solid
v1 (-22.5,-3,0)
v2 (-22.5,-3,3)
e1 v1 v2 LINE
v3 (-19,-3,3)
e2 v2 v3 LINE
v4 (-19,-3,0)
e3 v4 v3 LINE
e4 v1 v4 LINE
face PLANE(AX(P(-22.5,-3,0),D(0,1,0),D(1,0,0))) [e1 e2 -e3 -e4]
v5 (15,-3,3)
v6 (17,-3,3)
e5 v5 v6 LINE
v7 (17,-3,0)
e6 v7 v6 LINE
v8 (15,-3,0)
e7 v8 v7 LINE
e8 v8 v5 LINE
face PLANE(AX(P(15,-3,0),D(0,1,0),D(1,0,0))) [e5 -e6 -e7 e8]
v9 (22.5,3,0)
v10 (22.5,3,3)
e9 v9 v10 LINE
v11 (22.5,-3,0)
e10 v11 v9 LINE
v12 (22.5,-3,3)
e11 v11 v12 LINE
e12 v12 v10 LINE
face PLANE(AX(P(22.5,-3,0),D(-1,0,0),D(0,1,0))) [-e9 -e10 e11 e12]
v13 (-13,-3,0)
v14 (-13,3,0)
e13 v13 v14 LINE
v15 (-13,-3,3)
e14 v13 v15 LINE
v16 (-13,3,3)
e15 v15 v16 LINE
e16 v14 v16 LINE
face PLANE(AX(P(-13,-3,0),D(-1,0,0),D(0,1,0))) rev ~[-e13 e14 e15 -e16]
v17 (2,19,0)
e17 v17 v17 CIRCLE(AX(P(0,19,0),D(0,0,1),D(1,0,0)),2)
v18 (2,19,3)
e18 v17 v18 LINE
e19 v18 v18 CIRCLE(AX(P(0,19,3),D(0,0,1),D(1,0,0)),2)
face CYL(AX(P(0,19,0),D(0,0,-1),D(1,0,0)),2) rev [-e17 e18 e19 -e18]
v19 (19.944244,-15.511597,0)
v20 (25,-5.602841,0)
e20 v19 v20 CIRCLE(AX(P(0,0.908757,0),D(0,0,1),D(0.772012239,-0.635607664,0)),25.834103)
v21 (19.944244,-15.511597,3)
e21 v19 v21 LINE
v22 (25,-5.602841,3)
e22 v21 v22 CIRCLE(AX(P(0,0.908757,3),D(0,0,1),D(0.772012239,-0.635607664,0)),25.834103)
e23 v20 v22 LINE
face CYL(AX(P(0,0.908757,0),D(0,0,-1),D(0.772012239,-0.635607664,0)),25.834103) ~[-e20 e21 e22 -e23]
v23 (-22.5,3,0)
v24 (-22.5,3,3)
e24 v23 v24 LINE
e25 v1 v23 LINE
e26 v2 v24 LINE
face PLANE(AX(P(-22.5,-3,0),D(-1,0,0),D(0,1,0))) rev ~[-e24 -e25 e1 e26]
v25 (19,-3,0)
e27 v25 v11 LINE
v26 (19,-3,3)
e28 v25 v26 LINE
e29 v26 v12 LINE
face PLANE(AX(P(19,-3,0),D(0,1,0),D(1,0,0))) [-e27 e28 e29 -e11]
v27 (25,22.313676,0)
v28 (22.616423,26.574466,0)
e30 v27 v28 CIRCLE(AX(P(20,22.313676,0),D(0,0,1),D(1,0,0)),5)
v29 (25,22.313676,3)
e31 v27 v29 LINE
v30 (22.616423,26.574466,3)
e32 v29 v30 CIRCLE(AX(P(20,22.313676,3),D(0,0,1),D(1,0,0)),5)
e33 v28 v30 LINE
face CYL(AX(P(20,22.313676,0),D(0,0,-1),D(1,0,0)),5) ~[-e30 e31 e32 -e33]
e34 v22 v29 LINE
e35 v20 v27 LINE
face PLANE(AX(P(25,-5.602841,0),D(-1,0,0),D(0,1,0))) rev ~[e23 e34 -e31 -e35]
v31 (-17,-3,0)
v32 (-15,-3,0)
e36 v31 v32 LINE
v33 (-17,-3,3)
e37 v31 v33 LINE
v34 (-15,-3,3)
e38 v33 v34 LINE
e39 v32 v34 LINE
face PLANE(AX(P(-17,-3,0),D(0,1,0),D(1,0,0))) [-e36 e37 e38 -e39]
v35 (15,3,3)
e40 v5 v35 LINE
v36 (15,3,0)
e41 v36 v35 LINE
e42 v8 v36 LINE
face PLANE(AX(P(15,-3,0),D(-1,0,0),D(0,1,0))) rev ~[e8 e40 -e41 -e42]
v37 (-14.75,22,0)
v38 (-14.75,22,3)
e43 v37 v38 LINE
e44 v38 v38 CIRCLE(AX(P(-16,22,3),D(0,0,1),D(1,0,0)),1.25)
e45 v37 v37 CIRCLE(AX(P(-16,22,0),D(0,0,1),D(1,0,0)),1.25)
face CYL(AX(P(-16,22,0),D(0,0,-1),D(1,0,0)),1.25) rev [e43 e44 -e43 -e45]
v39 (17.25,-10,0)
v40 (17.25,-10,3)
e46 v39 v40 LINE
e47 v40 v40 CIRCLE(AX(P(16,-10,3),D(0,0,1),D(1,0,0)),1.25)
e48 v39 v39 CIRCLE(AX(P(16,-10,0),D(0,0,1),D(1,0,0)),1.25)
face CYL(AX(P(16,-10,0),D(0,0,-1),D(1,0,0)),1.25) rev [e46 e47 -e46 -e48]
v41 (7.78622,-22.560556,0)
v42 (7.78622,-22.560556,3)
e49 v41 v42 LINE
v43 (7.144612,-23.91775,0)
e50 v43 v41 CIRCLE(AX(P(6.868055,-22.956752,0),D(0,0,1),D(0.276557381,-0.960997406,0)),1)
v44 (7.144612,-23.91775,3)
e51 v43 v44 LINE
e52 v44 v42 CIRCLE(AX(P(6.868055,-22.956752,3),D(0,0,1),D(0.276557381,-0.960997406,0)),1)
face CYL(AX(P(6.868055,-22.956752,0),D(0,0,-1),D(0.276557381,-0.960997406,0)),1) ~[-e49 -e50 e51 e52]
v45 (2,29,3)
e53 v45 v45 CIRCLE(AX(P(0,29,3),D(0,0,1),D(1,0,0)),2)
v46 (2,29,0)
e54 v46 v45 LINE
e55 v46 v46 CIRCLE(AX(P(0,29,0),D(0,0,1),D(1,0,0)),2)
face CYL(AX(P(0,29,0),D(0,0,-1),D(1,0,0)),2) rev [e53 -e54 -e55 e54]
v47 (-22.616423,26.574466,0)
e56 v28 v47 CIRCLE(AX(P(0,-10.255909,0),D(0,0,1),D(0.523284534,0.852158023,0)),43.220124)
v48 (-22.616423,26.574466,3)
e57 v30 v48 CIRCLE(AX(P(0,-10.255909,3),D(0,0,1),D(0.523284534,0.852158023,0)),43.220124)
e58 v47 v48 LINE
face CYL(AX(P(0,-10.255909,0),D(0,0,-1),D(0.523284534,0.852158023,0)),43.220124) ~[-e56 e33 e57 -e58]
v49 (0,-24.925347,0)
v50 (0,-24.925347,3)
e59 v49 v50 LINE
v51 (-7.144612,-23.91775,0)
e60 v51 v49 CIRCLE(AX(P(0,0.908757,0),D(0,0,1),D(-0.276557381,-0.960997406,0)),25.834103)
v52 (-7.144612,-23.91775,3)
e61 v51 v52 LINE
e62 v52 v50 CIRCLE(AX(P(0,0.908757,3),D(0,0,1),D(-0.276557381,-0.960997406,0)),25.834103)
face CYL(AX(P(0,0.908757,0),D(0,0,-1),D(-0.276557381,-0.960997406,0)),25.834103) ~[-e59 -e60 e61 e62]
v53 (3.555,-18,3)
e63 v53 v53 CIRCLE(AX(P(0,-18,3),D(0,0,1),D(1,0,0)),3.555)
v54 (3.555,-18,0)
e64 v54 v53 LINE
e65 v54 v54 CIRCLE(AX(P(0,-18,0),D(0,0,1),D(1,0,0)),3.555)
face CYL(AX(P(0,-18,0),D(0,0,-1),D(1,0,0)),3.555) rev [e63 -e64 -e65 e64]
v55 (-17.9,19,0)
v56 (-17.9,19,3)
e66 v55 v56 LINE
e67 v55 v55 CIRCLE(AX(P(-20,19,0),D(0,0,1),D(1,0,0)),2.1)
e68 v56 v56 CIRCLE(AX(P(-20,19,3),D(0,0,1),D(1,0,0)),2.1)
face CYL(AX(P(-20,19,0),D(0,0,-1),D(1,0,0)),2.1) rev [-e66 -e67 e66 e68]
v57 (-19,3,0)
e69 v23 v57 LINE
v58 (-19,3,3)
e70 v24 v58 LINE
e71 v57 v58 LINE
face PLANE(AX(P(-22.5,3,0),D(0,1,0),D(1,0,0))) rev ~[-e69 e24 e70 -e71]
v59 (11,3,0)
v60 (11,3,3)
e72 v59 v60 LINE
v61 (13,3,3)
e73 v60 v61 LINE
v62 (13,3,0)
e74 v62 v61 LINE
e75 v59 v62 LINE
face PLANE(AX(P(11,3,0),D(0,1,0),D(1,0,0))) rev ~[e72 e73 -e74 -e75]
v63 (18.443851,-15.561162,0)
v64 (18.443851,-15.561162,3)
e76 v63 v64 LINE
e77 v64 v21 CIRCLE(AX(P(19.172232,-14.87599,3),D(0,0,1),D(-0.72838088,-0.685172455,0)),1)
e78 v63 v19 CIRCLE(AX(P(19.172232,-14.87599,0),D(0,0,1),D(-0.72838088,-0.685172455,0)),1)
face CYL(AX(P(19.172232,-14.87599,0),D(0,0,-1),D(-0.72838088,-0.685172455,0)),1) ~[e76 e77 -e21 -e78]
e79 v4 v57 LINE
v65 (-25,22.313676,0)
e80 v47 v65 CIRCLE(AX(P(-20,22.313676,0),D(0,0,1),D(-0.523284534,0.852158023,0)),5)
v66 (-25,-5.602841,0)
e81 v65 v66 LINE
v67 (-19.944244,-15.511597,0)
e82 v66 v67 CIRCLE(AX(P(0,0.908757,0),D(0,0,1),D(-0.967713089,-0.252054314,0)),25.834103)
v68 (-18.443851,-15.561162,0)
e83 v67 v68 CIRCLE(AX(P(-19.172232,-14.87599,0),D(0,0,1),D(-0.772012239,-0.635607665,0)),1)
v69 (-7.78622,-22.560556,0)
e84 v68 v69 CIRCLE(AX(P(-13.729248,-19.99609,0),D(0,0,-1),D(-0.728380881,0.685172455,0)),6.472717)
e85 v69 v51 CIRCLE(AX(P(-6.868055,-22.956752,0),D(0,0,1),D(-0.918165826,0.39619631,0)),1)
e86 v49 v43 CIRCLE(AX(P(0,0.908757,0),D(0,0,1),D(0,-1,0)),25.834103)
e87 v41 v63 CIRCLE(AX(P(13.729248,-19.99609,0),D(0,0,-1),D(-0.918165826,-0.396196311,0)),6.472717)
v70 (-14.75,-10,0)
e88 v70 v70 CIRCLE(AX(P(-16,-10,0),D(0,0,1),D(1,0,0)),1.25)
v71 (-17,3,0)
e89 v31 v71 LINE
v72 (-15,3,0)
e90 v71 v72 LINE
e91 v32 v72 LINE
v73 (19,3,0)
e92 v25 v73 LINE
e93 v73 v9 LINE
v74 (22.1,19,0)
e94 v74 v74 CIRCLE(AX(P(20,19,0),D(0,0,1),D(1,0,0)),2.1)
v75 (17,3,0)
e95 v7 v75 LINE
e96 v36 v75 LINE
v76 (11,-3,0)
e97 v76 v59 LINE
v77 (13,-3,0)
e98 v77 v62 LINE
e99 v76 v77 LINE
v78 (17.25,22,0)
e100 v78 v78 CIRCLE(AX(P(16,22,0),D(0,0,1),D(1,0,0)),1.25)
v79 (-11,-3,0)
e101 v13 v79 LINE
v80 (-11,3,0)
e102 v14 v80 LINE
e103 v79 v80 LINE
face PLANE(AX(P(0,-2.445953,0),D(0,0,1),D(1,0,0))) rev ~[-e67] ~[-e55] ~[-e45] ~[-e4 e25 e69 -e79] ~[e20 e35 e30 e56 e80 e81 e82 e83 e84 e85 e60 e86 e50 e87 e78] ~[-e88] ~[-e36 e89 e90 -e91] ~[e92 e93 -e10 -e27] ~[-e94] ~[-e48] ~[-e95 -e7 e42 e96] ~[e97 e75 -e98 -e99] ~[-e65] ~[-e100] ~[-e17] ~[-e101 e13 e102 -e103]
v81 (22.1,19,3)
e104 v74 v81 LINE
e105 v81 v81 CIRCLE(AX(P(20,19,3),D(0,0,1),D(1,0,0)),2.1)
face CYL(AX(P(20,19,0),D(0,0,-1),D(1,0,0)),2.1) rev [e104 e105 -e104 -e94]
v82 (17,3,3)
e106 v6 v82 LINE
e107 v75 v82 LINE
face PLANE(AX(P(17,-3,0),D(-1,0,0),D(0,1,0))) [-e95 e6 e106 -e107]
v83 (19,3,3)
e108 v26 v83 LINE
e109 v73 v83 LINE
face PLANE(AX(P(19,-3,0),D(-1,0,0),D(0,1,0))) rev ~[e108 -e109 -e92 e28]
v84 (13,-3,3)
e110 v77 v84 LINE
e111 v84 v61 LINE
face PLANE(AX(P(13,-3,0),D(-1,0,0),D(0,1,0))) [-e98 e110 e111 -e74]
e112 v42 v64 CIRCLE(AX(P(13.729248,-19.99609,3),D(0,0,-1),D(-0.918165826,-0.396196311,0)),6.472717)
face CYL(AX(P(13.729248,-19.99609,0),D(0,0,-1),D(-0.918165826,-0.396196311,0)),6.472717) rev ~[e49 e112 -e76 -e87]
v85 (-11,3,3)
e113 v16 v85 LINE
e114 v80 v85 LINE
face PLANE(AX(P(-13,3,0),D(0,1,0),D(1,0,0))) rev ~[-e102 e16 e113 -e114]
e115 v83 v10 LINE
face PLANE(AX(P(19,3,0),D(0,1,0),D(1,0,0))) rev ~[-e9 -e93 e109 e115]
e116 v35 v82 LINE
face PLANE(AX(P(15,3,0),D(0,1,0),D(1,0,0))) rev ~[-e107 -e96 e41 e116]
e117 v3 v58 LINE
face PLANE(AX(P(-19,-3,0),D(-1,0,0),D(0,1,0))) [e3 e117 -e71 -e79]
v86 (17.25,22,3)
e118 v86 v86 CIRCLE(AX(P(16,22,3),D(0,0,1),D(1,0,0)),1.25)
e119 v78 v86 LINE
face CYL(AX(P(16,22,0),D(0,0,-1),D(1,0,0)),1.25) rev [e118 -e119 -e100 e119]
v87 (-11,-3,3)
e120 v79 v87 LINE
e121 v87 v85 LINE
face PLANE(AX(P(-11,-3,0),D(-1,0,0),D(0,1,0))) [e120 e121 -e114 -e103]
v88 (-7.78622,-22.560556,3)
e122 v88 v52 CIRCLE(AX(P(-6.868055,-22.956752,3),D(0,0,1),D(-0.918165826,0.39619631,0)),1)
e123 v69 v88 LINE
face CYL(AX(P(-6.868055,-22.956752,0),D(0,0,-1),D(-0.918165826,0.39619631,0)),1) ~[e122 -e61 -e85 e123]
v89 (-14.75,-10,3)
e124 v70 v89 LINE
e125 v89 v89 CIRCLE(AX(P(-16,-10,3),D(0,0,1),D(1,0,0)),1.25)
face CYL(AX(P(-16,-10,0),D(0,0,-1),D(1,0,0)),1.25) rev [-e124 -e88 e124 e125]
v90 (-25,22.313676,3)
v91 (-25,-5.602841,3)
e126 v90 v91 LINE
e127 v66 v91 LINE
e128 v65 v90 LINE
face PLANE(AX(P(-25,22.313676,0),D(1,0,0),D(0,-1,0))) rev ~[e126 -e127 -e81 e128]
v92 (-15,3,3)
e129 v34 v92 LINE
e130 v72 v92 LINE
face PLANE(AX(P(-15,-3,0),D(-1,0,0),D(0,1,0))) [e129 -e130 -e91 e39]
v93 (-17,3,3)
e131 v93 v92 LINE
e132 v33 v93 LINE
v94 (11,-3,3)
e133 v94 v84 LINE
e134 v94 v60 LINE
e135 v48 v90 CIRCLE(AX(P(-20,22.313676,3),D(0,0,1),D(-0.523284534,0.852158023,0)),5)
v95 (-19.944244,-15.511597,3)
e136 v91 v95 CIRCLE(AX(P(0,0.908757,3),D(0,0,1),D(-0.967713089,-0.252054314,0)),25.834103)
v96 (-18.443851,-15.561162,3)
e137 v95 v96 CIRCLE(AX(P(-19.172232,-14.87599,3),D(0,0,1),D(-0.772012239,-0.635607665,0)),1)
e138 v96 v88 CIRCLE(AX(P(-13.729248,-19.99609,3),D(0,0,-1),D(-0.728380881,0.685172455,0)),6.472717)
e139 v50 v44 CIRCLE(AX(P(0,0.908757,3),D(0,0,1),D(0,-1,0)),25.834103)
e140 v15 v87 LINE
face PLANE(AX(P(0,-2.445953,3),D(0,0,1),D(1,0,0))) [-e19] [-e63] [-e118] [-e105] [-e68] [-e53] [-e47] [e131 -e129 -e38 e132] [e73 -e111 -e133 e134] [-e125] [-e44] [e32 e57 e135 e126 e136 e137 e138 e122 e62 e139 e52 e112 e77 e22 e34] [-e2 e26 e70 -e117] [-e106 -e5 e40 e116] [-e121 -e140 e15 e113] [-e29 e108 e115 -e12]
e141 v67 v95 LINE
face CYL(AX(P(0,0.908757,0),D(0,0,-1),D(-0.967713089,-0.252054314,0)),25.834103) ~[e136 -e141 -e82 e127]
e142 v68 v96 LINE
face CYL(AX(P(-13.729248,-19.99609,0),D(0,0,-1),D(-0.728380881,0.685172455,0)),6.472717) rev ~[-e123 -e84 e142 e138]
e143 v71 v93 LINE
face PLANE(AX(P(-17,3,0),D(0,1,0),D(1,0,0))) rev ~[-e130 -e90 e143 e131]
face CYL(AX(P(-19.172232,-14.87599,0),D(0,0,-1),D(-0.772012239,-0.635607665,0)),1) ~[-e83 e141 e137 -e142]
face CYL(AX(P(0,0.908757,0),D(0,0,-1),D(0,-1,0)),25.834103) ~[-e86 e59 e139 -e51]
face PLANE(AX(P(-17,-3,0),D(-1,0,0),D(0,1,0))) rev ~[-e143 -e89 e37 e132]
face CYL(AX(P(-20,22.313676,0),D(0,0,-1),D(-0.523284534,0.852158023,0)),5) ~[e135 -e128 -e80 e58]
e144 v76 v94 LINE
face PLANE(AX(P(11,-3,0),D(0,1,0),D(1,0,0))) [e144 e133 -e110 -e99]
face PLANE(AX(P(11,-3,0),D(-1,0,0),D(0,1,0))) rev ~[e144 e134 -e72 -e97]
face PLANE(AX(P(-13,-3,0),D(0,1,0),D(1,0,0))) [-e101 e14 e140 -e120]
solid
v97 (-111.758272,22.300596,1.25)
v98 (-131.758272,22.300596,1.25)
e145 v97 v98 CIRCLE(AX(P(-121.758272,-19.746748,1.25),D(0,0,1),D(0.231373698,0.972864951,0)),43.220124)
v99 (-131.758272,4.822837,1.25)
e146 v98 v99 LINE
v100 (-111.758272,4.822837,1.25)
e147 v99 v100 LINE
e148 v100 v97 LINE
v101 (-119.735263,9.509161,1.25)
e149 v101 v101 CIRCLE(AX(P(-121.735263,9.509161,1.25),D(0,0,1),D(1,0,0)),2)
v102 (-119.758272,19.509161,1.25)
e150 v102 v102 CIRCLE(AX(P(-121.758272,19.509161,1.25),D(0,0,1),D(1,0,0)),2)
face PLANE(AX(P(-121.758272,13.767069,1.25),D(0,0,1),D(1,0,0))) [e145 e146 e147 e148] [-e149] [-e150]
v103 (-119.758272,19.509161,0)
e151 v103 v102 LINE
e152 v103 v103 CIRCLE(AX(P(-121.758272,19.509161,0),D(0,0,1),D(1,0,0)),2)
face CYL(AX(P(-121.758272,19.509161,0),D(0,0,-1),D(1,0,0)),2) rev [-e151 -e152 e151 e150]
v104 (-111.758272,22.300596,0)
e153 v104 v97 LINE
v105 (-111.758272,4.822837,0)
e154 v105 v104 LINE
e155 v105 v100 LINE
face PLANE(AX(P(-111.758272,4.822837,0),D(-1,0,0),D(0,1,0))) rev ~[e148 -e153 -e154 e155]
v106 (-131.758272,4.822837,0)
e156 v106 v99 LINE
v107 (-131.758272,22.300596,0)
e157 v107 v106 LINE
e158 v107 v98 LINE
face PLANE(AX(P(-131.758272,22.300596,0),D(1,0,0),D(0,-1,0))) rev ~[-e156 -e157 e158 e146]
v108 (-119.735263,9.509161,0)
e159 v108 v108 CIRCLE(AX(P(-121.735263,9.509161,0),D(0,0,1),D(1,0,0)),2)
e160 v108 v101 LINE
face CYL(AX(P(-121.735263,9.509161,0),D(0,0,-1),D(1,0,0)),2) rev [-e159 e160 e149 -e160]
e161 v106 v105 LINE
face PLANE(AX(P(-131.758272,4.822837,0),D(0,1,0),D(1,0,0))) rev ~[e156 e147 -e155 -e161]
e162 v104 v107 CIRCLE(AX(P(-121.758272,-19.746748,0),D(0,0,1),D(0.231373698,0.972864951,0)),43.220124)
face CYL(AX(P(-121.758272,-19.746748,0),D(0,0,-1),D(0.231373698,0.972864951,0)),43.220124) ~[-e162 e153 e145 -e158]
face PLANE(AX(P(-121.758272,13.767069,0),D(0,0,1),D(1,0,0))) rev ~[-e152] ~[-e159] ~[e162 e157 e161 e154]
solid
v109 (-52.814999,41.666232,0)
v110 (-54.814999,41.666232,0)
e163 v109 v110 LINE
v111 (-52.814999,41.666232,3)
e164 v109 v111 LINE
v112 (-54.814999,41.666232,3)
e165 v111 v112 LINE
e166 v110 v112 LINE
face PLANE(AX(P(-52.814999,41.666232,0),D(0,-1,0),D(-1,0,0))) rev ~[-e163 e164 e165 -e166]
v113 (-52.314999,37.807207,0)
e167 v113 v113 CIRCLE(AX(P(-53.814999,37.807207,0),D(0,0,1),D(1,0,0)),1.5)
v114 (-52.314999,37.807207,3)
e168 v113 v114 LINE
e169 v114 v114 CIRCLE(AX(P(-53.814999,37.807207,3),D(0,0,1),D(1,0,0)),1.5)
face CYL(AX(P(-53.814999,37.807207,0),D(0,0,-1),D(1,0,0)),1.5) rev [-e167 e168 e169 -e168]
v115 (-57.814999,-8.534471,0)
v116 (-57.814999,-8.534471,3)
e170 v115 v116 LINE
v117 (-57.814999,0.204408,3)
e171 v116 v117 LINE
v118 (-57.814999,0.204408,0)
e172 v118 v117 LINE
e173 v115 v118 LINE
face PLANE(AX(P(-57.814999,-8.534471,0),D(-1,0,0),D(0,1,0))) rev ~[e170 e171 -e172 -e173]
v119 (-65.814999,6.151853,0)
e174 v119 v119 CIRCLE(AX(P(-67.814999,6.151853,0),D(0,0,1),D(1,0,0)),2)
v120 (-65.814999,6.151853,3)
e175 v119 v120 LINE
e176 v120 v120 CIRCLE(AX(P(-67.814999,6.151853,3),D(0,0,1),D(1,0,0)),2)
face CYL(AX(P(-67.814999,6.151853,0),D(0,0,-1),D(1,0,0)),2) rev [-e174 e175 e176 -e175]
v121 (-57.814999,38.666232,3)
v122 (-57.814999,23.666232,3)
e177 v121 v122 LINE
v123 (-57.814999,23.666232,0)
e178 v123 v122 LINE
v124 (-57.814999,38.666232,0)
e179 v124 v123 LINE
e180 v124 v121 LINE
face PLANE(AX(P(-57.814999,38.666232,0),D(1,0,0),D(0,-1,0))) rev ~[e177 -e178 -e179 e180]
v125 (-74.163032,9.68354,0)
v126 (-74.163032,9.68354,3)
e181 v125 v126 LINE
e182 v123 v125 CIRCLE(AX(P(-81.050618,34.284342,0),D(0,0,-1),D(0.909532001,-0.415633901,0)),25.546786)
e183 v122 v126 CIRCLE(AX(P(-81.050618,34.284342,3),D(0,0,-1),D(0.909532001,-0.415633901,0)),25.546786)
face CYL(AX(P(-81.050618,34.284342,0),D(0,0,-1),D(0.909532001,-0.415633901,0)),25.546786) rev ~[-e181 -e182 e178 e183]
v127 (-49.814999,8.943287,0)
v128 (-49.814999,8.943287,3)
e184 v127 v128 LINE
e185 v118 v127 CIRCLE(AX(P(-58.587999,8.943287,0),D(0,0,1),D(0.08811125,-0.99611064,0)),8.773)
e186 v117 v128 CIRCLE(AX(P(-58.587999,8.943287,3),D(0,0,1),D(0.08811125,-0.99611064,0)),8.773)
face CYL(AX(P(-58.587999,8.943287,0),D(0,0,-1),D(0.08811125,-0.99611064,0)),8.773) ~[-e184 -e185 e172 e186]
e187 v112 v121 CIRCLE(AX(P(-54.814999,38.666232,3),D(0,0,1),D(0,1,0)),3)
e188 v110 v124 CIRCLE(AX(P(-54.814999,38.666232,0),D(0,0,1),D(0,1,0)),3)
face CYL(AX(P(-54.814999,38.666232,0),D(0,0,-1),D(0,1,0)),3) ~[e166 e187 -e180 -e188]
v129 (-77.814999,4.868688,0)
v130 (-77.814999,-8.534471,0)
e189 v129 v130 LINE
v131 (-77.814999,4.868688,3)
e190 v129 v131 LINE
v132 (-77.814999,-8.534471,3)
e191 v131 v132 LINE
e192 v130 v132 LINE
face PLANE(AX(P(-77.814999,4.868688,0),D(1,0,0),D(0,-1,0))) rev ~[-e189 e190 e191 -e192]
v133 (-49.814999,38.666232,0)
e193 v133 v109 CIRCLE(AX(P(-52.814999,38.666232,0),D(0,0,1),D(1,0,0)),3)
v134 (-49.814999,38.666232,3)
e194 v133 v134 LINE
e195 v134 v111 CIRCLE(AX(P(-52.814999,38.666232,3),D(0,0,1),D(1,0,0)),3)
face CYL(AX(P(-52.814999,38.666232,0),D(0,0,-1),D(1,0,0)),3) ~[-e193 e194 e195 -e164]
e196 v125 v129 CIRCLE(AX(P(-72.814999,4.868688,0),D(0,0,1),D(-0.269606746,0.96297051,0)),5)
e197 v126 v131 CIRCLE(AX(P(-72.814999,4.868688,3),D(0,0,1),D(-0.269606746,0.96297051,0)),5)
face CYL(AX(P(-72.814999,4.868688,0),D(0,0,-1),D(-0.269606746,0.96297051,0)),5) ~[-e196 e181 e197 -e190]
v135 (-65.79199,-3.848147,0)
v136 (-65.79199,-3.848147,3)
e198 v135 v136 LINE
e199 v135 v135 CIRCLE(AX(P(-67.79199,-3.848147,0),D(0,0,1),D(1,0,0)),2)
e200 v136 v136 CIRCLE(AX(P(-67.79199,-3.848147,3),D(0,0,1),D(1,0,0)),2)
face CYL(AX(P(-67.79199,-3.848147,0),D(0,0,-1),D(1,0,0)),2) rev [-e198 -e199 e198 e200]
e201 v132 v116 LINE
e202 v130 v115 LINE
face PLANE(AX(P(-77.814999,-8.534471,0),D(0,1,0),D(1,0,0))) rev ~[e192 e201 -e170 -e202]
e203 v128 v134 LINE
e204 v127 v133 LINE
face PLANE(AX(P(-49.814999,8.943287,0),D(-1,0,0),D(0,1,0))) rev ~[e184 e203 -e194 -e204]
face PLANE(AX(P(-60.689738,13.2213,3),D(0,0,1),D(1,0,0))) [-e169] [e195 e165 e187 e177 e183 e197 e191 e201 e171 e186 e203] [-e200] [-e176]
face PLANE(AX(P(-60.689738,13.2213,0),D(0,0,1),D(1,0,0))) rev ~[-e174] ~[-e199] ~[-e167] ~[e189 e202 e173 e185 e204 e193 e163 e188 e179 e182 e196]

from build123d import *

# Parameters (mm, degrees)
F0_R     = 1.25
F0_R_2   = 3.555
F0_W     = 3.5
F0_H     = 6
F0_W_2   = 2
F0_R_3   = 2.1
F0_R_4   = 2
F1_DEPTH = 3
F0_R_5   = 1.5
F2_DEPTH = 3
F4_R     = 2.1
F4_R_2   = 2.25
F5_DEPTH = 25
F6_DEPTH = 1.25


# Not quite as in the source:
# - a feature names something its author has since deleted; it is built from what else it names


with BuildPart() as f1:
    # F0 (on Top) → F1 (new body)
    with BuildSketch(Plane.XY):
        with BuildLine():
            Line((25, 14.3136761677), (-25, 14.3136761677))
            Line((-25, 14.3136761677), (-25, -5.6028405869))
            ThreePointArc((-25, -5.6028405869), (-23.0117824833, -10.8325706042), (-19.9442440013, -15.5115974911))
            ThreePointArc((-19.9442440013, -15.5115974911), (-19.2052482882, -15.8754446325), (-18.443850882, -15.5611622815))
            ThreePointArc((-18.443850882, -15.5611622815), (-10.1760612052, -14.5858281895), (-7.7862204272, -22.5605560084))
            ThreePointArc((-7.7862204272, -22.5605560084), (-7.7721201862, -23.38414607), (-7.1446119827, -23.9177497252))
            ThreePointArc((-7.1446119827, -23.9177497252), (-3.6076561704, -24.6722072912), (0, -24.9253467642))
            ThreePointArc((0, -24.9253467642), (3.6076561704, -24.6722072912), (7.1446119827, -23.9177497252))
            ThreePointArc((7.1446119827, -23.9177497252), (7.7721201862, -23.38414607), (7.7862204272, -22.5605560084))
            ThreePointArc((7.7862204272, -22.5605560084), (10.1760612052, -14.5858281895), (18.443850882, -15.5611622815))
            ThreePointArc((18.443850882, -15.5611622815), (19.2052482882, -15.8754446325), (19.9442440013, -15.5115974911))
            ThreePointArc((19.9442440013, -15.5115974911), (23.0117824833, -10.8325706042), (25, -5.6028405869))
            Line((25, -5.6028405869), (25, 14.3136761677))
        make_face()
        with Locations((-16, -10)):
            Circle(F0_R, mode=Mode.SUBTRACT)
        with Locations((0, -18)):
            Circle(F0_R_2, mode=Mode.SUBTRACT)
        with Locations((16, -10)):
            Circle(F0_R, mode=Mode.SUBTRACT)
        with Locations((-20.75, 0)):
            Rectangle(F0_W, F0_H, mode=Mode.SUBTRACT)
        with Locations((-16, 0)):
            Rectangle(F0_W_2, F0_H, mode=Mode.SUBTRACT)
        with Locations((-12, 0)):
            Rectangle(F0_W_2, F0_H, mode=Mode.SUBTRACT)
        with Locations((12, 0)):
            Rectangle(F0_W_2, F0_H, mode=Mode.SUBTRACT)
        with Locations((16, 0)):
            Rectangle(F0_W_2, F0_H, mode=Mode.SUBTRACT)
        with Locations((20.75, 0)):
            Rectangle(F0_W, F0_H, mode=Mode.SUBTRACT)
        with BuildLine():
            ThreePointArc((-22.6164226719, 26.5744662824), (-24.3636059263, 24.7547708647), (-25, 22.3136761677))
            Line((-25, 22.3136761677), (-25, 14.3136761677))
            Line((-25, 14.3136761677), (25, 14.3136761677))
            Line((25, 14.3136761677), (25, 22.3136761677))
            ThreePointArc((25, 22.3136761677), (24.3636059263, 24.7547708647), (22.6164226719, 26.5744662824))
            ThreePointArc((22.6164226719, 26.5744662824), (0, 32.964214922), (-22.6164226719, 26.5744662824))
        make_face()
        with Locations((-20, 19)):
            Circle(F0_R_3, mode=Mode.SUBTRACT)
        with Locations((-16, 22)):
            Circle(F0_R, mode=Mode.SUBTRACT)
        with Locations((0, 19)):
            Circle(F0_R_4, mode=Mode.SUBTRACT)
        with Locations((20, 19)):
            Circle(F0_R_3, mode=Mode.SUBTRACT)
        with Locations((16, 22)):
            Circle(F0_R, mode=Mode.SUBTRACT)
        with Locations((0, 29)):
            Circle(F0_R_4, mode=Mode.SUBTRACT)
    extrude(amount=F1_DEPTH)


with BuildPart() as f1b:
    # F0 (on Top) → F1, piece 2 (new body)
    with BuildSketch(Plane.XY):
        with BuildLine():
            Line((-77.8149985122, 4.86868793), (-77.8149985122, -8.5344709849))
            Line((-77.8149985122, -8.5344709849), (-57.8149985122, -8.5344709849))
            Line((-57.8149985122, -8.5344709849), (-57.8149985122, 0.2044082856))
            ThreePointArc((-57.8149985122, 0.2044082856), (-52.1170226198, 3.0194368328), (-49.8149985122, 8.9432869322))
            Line((-49.8149985122, 8.9432869322), (-49.8149985122, 38.6662318432))
            ThreePointArc((-49.8149985122, 38.6662318432), (-50.6936781686, 40.7875521867), (-52.8149985122, 41.6662318432))
            Line((-52.8149985122, 41.6662318432), (-54.8149985122, 41.6662318432))
            ThreePointArc((-54.8149985122, 41.6662318432), (-56.9363188557, 40.7875521867), (-57.8149985122, 38.6662318432))
            Line((-57.8149985122, 38.6662318432), (-57.8149985122, 23.6662318432))
            ThreePointArc((-57.8149985122, 23.6662318432), (-64.445474594, 14.8702366754), (-74.1630322412, 9.6835404787))
            ThreePointArc((-74.1630322412, 9.6835404787), (-76.798725953, 7.8902629626), (-77.8149985122, 4.86868793))
        make_face()
        with Locations((-67.7919896514, -3.8481471525)):
            Circle(F0_R_4, mode=Mode.SUBTRACT)
        with Locations((-67.8149985122, 6.1518528475)):
            Circle(F0_R_4, mode=Mode.SUBTRACT)
        with Locations((-53.8149985122, 37.8072073483)):
            Circle(F0_R_5, mode=Mode.SUBTRACT)
    extrude(amount=F1_DEPTH)


with BuildPart() as f2:
    # F0 (on Top) → F2 (new body)
    with BuildSketch(Plane.XY):
        with BuildLine():
            ThreePointArc((-22.6164226719, 26.5744662824), (-24.3636059263, 24.7547708647), (-25, 22.3136761677))
            Line((-25, 22.3136761677), (-25, 14.3136761677))
            Line((-25, 14.3136761677), (25, 14.3136761677))
            Line((25, 14.3136761677), (25, 22.3136761677))
            ThreePointArc((25, 22.3136761677), (24.3636059263, 24.7547708647), (22.6164226719, 26.5744662824))
            ThreePointArc((22.6164226719, 26.5744662824), (0, 32.964214922), (-22.6164226719, 26.5744662824))
        make_face()
        with Locations((-20, 19)):
            Circle(F0_R_3, mode=Mode.SUBTRACT)
        with Locations((-16, 22)):
            Circle(F0_R, mode=Mode.SUBTRACT)
        with Locations((0, 19)):
            Circle(F0_R_4, mode=Mode.SUBTRACT)
        with Locations((20, 19)):
            Circle(F0_R_3, mode=Mode.SUBTRACT)
        with Locations((16, 22)):
            Circle(F0_R, mode=Mode.SUBTRACT)
        with Locations((0, 29)):
            Circle(F0_R_4, mode=Mode.SUBTRACT)
        with Locations((-16, 22)):
            Circle(F0_R)
        with Locations((16, 22)):
            Circle(F0_R)
    extrude(amount=F2_DEPTH)


with BuildPart() as f2_1:
    # F3: moved
    add(f2.part.moved(Location((55.75, 0, 0))))

    # F4 (on face) → F5 (cut)
    with BuildSketch(Plane.XY.offset(3)):
        with BuildLine():
            Line((30.75, 14.3136761677), (45.75, 14.3136761677))
            Line((45.75, 14.3136761677), (45.75, 25.7562933257))
            ThreePointArc((45.75, 25.7562933257), (46.2050390496, 27.8403590538), (47.4873319836, 29.5450922667))
            ThreePointArc((47.4873319836, 29.5450922667), (51.3440284338, 31.9183440188), (55.75, 32.964214922))
            ThreePointArc((55.75, 32.964214922), (43.9991334133, 31.3361124445), (33.1335773281, 26.5744662824))
            ThreePointArc((33.1335773281, 26.5744662824), (31.3863940737, 24.7547708647), (30.75, 22.3136761677))
            Line((30.75, 22.3136761677), (30.75, 14.3136761677))
        make_face()
        with Locations((35.75, 19)):
            Circle(F4_R, mode=Mode.SUBTRACT)
        with Locations((42.75, 19)):
            Circle(F4_R_2, mode=Mode.SUBTRACT)
        with BuildLine():
            ThreePointArc((58.8838195988, 32.8504511649), (60.9470746388, 32.3880346997), (62.9193889887, 31.6259149894))
            ThreePointArc((62.9193889887, 31.6259149894), (70.6461883393, 24.5054009937), (73.2023363863, 14.3136761677))
            Line((73.2023363863, 14.3136761677), (80.75, 14.3136761677))
            Line((80.75, 14.3136761677), (80.75, 22.3136761677))
            ThreePointArc((80.75, 22.3136761677), (80.1136059263, 24.7547708647), (78.3664226719, 26.5744662824))
            ThreePointArc((78.3664226719, 26.5744662824), (69.0020089349, 30.8824353153), (58.8838195988, 32.8504511649))
        make_face()
        with Locations((75.75, 19)):
            Circle(F4_R, mode=Mode.SUBTRACT)
        with Locations((42.75, 19)):
            Circle(F4_R_2)
        with Locations((68.75, 19)):
            Circle(F4_R_2)
    extrude(amount=-F5_DEPTH, mode=Mode.SUBTRACT)


with BuildPart() as f6:
    # F0 (on Top) → F6 (new body)
    with BuildSketch(Plane.XY):
        with BuildLine():
            Line((-111.7582723053, 4.8228372639), (-111.7582723053, 22.3005958048))
            ThreePointArc((-111.7582723053, 22.3005958048), (-121.7582723053, 23.4733760182), (-131.7582723053, 22.3005958048))
            Line((-131.7582723053, 22.3005958048), (-131.7582723053, 4.8228372639))
            Line((-131.7582723053, 4.8228372639), (-111.7582723053, 4.8228372639))
        make_face()
        with Locations((-121.7352634446, 9.5091610962)):
            Circle(F0_R_4, mode=Mode.SUBTRACT)
        with Locations((-121.7582723053, 19.5091610962)):
            Circle(F0_R_4, mode=Mode.SUBTRACT)
    extrude(amount=F6_DEPTH)


solid = Compound([f1.part, f1b.part, f6.part])
